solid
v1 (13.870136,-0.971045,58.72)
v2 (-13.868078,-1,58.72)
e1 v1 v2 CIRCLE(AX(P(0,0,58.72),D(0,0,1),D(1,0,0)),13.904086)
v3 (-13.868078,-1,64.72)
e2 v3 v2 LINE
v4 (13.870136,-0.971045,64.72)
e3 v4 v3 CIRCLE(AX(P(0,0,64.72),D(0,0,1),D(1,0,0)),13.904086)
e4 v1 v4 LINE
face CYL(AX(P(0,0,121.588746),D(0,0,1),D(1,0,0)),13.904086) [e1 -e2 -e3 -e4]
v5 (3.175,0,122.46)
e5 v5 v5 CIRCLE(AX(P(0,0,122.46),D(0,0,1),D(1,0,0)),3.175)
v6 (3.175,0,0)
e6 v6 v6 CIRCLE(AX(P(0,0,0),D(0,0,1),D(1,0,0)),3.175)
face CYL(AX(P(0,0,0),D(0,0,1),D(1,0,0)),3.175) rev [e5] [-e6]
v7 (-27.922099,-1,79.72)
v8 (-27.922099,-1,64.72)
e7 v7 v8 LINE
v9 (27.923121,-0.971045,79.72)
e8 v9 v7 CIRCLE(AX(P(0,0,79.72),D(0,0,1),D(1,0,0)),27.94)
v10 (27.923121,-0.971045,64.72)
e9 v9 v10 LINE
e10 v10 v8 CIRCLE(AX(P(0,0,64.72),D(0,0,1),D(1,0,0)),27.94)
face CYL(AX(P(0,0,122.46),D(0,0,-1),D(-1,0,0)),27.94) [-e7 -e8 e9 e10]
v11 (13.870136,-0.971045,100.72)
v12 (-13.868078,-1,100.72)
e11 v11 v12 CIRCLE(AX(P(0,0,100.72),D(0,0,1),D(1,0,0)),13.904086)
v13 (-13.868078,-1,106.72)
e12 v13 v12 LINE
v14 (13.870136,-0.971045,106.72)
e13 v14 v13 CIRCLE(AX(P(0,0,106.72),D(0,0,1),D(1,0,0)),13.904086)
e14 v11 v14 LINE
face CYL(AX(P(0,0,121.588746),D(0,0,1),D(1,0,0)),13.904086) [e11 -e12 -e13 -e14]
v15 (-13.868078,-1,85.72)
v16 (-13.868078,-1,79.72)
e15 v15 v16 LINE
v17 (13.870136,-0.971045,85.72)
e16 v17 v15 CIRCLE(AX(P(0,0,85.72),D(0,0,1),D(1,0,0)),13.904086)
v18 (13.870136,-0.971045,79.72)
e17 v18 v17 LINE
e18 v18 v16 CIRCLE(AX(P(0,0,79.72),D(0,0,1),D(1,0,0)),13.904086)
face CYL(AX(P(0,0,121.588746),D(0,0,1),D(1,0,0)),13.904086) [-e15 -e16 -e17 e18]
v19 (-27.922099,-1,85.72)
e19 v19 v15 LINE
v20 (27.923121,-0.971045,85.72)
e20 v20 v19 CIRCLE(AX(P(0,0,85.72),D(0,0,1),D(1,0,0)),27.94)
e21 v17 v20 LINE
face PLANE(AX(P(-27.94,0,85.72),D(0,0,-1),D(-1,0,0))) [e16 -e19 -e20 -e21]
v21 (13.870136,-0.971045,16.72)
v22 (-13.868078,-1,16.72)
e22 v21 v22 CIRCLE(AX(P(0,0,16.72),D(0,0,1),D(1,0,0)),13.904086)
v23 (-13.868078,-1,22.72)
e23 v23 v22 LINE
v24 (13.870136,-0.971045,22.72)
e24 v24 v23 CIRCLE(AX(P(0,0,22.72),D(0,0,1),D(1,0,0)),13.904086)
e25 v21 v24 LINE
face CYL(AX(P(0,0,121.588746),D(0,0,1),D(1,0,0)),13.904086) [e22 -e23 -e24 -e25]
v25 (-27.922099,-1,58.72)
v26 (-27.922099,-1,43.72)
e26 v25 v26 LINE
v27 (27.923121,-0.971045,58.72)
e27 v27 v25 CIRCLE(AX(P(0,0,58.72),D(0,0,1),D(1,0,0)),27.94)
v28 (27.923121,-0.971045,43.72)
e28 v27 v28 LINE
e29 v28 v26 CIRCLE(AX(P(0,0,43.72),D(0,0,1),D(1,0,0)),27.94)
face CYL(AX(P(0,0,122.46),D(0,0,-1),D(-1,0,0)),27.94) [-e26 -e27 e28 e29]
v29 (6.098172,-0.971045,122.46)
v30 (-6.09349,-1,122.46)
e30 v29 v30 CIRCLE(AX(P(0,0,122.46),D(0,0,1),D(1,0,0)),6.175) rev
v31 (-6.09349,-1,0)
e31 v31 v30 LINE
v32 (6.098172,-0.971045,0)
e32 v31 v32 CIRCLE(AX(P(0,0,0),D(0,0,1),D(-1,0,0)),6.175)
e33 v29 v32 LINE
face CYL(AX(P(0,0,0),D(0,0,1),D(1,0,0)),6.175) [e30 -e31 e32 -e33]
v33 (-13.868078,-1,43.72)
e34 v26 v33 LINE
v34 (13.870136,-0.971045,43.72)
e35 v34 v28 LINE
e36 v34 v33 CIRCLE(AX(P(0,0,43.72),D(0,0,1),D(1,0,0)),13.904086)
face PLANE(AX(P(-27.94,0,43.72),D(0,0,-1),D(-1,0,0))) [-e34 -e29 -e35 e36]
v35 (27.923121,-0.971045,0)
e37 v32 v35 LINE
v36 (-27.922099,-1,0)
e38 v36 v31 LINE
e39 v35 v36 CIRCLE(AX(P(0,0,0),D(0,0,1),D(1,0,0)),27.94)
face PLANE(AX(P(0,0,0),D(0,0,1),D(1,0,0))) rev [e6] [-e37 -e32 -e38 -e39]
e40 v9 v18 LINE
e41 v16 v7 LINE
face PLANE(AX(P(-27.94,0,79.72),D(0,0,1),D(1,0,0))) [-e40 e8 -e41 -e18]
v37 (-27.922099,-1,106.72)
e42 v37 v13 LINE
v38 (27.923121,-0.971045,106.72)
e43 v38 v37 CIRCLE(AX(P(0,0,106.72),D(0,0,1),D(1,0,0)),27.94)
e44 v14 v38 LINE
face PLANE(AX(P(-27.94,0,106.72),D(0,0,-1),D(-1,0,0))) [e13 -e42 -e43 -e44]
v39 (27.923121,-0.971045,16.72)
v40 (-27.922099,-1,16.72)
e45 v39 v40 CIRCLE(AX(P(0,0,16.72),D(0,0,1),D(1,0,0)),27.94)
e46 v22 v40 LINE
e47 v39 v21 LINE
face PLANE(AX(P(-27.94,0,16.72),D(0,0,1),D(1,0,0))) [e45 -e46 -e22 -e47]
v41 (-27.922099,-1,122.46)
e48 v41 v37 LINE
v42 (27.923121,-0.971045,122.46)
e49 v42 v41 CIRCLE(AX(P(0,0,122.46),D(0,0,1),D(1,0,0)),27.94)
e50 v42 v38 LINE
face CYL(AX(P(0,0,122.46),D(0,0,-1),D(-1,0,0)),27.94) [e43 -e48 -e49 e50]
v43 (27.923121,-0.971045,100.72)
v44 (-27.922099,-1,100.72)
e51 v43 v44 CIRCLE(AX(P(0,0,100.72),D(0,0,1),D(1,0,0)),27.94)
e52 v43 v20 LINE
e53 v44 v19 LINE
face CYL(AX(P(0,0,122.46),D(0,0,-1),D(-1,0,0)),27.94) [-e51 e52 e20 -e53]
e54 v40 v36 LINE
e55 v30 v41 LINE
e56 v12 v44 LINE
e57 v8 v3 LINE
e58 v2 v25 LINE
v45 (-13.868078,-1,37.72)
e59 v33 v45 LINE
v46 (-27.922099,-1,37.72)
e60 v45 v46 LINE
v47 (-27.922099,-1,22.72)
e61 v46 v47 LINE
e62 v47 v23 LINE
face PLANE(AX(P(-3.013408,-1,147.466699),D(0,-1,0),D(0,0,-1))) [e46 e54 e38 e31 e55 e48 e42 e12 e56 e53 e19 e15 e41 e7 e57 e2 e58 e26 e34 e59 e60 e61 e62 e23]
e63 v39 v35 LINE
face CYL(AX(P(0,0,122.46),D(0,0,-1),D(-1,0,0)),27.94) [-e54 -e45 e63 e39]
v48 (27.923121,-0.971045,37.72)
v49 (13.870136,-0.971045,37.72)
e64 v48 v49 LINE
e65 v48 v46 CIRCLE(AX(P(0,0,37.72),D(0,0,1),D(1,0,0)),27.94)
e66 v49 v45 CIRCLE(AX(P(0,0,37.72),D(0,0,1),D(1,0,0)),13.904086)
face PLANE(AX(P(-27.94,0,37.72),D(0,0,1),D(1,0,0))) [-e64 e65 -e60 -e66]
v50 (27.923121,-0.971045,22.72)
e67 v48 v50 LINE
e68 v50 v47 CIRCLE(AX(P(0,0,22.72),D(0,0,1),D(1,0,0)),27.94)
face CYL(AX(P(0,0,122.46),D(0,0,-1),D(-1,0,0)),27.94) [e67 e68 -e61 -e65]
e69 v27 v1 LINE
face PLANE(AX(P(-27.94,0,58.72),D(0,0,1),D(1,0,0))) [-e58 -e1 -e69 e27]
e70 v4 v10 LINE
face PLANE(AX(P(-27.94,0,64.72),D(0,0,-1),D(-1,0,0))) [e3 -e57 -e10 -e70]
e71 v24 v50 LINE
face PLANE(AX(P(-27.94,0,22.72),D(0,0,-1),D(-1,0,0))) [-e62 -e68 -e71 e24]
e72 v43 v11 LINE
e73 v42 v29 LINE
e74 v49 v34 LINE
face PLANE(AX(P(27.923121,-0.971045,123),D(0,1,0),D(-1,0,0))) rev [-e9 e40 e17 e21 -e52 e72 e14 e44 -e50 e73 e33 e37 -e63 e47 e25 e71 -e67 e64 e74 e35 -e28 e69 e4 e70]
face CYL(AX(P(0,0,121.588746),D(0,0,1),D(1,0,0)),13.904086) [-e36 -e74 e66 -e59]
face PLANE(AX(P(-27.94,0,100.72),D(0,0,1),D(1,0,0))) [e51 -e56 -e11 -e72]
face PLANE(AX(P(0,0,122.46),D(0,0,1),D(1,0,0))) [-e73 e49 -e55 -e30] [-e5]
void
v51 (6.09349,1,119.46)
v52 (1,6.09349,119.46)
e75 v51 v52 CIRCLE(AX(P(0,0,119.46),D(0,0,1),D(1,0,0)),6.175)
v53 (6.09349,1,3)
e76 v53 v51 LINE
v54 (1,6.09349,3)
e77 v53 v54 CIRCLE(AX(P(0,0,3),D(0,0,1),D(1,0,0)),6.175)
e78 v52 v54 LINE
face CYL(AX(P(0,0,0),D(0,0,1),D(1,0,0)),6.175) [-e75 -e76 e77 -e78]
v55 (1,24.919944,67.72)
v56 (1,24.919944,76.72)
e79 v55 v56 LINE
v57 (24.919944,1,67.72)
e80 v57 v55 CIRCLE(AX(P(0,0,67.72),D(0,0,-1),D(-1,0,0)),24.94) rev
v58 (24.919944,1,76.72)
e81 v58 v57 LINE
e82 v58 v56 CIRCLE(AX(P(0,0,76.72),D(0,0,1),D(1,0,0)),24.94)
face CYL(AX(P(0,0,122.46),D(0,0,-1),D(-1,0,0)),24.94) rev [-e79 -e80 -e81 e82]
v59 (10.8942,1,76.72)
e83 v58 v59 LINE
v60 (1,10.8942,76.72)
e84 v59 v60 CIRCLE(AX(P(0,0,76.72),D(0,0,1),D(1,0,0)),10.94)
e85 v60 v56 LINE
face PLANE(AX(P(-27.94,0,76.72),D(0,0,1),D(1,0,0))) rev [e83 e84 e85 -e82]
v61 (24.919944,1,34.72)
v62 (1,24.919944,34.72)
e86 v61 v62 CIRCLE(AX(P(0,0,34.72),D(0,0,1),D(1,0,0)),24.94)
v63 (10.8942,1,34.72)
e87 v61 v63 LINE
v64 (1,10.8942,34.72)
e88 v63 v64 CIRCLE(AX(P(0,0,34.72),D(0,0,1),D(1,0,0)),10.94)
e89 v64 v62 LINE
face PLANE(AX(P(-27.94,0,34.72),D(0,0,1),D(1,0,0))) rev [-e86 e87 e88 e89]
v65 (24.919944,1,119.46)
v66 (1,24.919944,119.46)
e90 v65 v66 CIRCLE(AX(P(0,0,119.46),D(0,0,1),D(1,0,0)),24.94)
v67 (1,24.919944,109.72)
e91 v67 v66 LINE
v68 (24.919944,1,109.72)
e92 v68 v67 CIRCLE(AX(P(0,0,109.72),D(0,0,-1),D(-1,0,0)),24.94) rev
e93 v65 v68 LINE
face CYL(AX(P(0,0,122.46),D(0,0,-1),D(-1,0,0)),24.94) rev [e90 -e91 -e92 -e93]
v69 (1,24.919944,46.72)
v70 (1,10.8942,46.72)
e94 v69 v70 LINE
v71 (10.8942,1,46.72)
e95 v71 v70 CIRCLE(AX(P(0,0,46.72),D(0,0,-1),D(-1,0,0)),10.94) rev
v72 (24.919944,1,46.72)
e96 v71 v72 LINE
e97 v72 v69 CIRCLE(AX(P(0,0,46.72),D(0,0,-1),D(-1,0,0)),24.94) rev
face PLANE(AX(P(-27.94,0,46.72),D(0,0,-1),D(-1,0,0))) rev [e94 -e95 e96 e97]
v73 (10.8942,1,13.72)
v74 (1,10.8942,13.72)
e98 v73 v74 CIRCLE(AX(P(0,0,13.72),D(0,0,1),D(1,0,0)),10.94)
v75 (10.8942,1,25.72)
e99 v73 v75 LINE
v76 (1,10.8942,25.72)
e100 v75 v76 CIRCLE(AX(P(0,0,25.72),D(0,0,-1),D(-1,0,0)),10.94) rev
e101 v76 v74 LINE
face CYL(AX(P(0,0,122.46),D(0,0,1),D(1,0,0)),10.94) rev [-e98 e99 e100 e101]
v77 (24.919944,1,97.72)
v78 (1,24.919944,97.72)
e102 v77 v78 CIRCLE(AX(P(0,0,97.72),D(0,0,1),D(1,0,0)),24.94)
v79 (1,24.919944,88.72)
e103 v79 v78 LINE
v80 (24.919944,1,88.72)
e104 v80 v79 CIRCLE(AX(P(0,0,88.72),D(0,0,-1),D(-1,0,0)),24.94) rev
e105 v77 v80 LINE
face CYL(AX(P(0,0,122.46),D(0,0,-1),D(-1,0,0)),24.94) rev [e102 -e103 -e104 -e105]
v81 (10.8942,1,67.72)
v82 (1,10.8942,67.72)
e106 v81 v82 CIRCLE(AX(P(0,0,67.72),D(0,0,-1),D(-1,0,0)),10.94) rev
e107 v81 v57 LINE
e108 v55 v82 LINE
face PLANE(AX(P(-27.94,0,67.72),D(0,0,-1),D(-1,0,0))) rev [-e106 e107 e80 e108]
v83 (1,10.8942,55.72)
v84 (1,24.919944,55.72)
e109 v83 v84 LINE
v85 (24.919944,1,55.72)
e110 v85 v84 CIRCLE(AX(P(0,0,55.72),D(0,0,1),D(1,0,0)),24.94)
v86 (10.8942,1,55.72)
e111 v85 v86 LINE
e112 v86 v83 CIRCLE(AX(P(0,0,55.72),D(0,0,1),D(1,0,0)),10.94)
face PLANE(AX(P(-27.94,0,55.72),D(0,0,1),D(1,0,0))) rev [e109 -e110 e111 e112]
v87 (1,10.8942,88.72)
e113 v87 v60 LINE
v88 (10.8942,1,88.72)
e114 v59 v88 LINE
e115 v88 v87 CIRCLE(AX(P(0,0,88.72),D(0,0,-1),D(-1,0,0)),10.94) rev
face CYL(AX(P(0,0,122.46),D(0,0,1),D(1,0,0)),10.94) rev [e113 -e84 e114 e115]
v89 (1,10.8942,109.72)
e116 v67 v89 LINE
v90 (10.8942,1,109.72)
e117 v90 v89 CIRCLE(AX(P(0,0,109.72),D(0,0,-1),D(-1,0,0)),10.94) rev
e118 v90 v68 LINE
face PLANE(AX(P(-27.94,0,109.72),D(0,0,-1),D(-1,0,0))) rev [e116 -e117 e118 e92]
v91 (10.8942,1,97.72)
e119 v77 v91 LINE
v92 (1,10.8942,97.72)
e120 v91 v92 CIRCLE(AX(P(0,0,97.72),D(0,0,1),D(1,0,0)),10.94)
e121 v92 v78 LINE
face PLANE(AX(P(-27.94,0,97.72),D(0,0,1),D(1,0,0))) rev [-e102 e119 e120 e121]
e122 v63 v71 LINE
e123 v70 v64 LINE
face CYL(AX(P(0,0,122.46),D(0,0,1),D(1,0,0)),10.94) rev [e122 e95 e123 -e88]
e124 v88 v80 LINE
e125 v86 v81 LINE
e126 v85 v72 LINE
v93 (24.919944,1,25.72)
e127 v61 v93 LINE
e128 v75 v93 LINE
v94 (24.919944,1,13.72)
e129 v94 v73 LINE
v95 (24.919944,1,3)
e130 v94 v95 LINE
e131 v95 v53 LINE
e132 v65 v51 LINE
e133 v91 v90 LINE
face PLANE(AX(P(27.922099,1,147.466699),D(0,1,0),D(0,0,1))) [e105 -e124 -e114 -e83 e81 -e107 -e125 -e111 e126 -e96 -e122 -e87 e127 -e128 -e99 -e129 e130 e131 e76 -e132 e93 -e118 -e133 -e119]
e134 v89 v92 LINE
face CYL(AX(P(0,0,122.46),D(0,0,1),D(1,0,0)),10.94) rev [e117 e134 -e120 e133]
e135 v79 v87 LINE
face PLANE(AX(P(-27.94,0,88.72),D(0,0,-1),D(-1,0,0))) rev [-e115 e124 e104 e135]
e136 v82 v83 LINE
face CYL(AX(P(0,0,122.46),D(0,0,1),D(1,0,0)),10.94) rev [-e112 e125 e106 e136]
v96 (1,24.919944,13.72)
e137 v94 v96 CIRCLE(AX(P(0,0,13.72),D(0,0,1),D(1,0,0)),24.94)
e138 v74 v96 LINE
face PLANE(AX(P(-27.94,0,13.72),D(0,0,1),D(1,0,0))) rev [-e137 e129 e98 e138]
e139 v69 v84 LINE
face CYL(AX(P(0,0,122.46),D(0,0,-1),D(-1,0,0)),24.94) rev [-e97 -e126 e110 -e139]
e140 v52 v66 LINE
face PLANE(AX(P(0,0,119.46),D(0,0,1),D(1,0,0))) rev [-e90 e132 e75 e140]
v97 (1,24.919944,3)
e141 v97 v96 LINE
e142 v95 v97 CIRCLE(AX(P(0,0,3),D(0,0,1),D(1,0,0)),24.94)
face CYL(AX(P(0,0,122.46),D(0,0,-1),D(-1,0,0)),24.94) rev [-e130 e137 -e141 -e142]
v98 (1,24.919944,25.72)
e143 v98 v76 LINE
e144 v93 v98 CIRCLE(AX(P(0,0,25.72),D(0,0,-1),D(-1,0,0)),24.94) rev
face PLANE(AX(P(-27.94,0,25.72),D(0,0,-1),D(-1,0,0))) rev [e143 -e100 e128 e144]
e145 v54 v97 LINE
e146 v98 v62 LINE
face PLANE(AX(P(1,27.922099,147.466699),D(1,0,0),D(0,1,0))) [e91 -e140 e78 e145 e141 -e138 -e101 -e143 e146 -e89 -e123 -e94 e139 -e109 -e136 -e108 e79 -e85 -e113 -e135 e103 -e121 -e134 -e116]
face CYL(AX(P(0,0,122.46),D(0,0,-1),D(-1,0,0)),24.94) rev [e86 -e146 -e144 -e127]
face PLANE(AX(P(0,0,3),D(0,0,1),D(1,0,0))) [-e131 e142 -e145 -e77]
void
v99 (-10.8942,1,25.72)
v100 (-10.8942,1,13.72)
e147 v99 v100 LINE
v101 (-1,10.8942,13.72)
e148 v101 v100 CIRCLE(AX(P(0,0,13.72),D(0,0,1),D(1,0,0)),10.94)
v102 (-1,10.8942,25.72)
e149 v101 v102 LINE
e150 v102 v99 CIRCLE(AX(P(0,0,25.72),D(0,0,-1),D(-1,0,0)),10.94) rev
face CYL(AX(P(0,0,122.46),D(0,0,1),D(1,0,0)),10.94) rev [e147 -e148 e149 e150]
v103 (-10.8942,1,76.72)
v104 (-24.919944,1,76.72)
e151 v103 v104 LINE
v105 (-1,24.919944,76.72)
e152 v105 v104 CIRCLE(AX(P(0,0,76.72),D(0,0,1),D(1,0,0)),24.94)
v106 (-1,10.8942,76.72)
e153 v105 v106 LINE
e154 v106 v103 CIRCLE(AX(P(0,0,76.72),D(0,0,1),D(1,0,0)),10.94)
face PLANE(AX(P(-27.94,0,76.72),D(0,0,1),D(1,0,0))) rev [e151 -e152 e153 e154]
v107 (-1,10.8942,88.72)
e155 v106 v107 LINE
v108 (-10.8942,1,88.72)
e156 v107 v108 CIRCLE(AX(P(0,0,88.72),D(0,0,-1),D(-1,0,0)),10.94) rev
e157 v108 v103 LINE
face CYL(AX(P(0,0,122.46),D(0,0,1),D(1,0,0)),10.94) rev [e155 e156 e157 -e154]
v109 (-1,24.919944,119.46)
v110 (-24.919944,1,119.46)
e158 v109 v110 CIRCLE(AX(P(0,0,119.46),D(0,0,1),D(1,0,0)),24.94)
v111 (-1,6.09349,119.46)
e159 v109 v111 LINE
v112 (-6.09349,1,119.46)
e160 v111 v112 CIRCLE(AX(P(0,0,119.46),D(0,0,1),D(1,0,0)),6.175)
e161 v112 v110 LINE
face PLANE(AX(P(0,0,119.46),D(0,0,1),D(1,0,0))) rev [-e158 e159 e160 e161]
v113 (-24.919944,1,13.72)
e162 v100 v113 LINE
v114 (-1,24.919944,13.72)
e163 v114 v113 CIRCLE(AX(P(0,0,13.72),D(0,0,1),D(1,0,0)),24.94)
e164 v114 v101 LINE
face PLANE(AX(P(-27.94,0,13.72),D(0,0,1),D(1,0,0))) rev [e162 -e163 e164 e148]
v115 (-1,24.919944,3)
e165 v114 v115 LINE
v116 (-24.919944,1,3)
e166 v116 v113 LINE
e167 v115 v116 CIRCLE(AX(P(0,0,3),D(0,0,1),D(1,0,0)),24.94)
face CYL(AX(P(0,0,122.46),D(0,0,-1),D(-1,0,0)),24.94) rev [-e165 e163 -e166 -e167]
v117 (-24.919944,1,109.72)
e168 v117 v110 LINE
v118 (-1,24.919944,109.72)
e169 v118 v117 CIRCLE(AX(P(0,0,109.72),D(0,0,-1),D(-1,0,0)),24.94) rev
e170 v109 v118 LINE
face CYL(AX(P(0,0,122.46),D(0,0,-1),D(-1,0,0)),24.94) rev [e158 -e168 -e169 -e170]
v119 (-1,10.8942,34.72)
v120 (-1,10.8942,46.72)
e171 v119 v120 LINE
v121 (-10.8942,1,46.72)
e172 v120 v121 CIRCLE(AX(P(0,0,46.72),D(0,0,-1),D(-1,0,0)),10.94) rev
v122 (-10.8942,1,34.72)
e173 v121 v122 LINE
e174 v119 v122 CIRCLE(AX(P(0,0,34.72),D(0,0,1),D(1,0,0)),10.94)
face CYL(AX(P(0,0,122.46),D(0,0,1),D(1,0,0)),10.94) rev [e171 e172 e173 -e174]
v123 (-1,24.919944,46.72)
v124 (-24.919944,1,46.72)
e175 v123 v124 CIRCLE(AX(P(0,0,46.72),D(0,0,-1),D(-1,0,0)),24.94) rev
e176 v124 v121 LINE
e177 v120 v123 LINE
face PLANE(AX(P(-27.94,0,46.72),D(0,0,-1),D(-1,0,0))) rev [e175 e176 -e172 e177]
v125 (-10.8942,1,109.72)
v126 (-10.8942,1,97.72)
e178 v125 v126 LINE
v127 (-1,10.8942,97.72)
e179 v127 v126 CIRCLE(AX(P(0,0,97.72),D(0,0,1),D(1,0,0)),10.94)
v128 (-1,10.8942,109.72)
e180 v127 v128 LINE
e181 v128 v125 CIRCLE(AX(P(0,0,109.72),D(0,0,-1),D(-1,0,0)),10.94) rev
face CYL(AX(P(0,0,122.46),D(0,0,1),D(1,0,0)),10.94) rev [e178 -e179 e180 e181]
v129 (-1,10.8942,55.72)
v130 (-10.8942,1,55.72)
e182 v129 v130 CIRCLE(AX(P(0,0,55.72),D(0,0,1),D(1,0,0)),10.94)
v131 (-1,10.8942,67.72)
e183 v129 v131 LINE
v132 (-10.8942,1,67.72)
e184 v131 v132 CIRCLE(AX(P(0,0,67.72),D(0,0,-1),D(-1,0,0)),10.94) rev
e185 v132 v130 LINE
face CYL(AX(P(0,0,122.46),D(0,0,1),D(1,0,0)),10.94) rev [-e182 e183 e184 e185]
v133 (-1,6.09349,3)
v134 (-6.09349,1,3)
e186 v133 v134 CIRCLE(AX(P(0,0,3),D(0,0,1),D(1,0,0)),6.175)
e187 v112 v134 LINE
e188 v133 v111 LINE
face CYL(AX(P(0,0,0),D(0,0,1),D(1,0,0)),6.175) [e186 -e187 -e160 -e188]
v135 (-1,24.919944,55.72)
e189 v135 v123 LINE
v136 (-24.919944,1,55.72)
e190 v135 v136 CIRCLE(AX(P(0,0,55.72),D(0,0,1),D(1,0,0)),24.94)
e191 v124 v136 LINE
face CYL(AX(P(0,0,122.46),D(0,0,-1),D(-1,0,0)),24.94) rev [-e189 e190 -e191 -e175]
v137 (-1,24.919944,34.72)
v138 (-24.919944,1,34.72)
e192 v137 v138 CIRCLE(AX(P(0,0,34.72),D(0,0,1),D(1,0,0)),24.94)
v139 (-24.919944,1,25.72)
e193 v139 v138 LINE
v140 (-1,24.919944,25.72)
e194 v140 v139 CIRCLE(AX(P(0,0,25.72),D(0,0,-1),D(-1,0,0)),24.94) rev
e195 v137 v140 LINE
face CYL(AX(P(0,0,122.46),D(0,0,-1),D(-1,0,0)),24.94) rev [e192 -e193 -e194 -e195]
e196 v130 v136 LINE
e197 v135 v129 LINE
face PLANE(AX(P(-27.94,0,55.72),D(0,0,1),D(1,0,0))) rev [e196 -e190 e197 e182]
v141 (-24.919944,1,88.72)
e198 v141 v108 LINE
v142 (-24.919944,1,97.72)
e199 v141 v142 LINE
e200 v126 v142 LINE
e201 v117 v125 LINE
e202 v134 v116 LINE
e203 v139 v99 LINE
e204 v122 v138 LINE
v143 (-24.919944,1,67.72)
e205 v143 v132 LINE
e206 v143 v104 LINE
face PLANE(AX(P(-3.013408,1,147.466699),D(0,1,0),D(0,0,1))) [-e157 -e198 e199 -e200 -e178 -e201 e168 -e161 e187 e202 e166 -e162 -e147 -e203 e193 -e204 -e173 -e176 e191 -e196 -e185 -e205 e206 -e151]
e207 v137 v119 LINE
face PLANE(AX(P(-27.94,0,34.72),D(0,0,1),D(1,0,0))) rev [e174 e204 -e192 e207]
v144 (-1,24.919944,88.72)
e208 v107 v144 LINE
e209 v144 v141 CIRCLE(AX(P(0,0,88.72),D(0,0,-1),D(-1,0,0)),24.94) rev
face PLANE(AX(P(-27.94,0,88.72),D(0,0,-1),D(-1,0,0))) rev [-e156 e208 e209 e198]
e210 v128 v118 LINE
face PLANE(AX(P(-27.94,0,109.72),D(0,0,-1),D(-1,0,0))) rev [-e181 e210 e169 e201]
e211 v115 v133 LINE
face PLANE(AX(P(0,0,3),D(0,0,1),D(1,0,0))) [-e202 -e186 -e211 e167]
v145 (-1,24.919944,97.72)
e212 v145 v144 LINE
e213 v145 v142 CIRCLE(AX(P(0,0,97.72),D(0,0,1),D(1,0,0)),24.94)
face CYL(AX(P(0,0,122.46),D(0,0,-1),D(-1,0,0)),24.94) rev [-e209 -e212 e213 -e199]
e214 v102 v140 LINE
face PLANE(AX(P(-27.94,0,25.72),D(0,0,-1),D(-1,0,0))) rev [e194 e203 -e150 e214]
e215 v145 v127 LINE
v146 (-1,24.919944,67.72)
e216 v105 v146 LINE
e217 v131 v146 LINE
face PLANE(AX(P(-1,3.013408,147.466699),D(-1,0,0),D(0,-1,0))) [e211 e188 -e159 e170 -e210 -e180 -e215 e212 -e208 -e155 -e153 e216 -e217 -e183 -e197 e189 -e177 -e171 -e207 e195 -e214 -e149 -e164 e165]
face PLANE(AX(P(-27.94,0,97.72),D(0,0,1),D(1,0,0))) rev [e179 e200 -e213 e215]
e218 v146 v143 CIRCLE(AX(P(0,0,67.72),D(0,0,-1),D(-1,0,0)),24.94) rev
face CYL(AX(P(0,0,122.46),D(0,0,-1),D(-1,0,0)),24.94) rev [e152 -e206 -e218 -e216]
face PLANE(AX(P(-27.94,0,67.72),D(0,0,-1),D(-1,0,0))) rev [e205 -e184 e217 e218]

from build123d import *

# Parameters (mm, degrees)
SKETCH3_R            = 27.94
BOSS_EXTRUDE2_DEPTH  = 122.46
SKETCH5_R            = 3.175
CUT_EXTRUDE1_DEPTH   = 129.676877488
SKETCH4_W            = 14
SKETCH4_H            = 6
SHELL1_START         = 3
SHELL1_OUTLINE_R     = 10.94
SHELL1_OUTLINE_R_2   = 6.175
SHELL1_DEPTH         = 116.46
SHELL1_2_OUTLINE_R   = 24.94
SHELL1_2_OUTLINE_R_2 = 10.94
SHELL1_2_DEPTH       = 10.72
SHELL1_START_2       = 109.72
SHELL1_3_OUTLINE_R   = 24.94
SHELL1_3_OUTLINE_R_2 = 10.94
SHELL1_3_DEPTH       = 9.74
SHELL1_START_3       = 25.72
SHELL1_4_OUTLINE_R   = 24.94
SHELL1_4_OUTLINE_R_2 = 10.94
SHELL1_4_DEPTH       = 9
SHELL1_START_4       = 46.72
SHELL1_5_OUTLINE_R   = 24.94
SHELL1_5_OUTLINE_R_2 = 10.94
SHELL1_5_DEPTH       = 9
SHELL1_START_5       = 67.72
SHELL1_6_OUTLINE_R   = 24.94
SHELL1_6_OUTLINE_R_2 = 10.94
SHELL1_6_DEPTH       = 9
SHELL1_START_6       = 88.72
SHELL1_7_OUTLINE_R   = 24.94
SHELL1_7_OUTLINE_R_2 = 10.94
SHELL1_7_DEPTH       = 9
BOSS_EXTRUDE3_REACH  = 130.677
SKETCH13_W           = 16.483162312
SKETCH13_H           = 6
CUT_EXTRUDE3_DEPTH   = 123


# Read off the part's stored shape, not the designer's step: Shell1
with BuildPart() as part:
    # Sketch3 → Boss-Extrude2 (new body)
    with BuildSketch(Plane.XY):
        Circle(SKETCH3_R)
    extrude(amount=BOSS_EXTRUDE2_DEPTH)

    # Sketch5 → Cut-Extrude1 (cut, through all)
    with BuildSketch(Plane.XY.offset(122.46)):
        Circle(SKETCH5_R)
    extrude(amount=-CUT_EXTRUDE1_DEPTH, mode=Mode.SUBTRACT)

    # Sketch4 → Cut-Revolve1 (revolve, cut)
    with BuildSketch(Plane(origin=(0, 0, 0), x_dir=(1, 0, 0), z_dir=(0, 1, 0)), mode=Mode.PRIVATE) as cut_revolve1_sk:
        with Locations((-20.94, -103.72)):
            Rectangle(SKETCH4_W, SKETCH4_H)
        with Locations((-20.94, -82.72)):
            Rectangle(SKETCH4_W, SKETCH4_H)
        with Locations((-20.94, -61.72)):
            Rectangle(SKETCH4_W, SKETCH4_H)
        with Locations((-20.94, -40.72)):
            Rectangle(SKETCH4_W, SKETCH4_H)
        with Locations((-20.94, -19.72)):
            Rectangle(SKETCH4_W, SKETCH4_H)
    revolve(cut_revolve1_sk.sketch.rotate(Axis((0, 0, 122.46), (0, 0, -1)), 180), axis=Axis((0, 0, 122.46), (0, 0, -1)), mode=Mode.SUBTRACT)

    # Shell1 outline → Shell1 (cut)
    with BuildSketch(Plane.XY.offset(SHELL1_START)):
        Circle(SHELL1_OUTLINE_R)
        Circle(SHELL1_OUTLINE_R_2, mode=Mode.SUBTRACT)
    extrude(amount=SHELL1_DEPTH, mode=Mode.SUBTRACT)

    # Shell1 2 outline → Shell1 2 (cut)
    with BuildSketch(Plane.XY.offset(SHELL1_START)):
        Circle(SHELL1_2_OUTLINE_R)
        Circle(SHELL1_2_OUTLINE_R_2, mode=Mode.SUBTRACT)
    extrude(amount=SHELL1_2_DEPTH, mode=Mode.SUBTRACT)

    # Shell1 3 outline → Shell1 3 (cut)
    with BuildSketch(Plane.XY.offset(SHELL1_START_2)):
        Circle(SHELL1_3_OUTLINE_R)
        Circle(SHELL1_3_OUTLINE_R_2, mode=Mode.SUBTRACT)
    extrude(amount=SHELL1_3_DEPTH, mode=Mode.SUBTRACT)

    # Shell1 4 outline → Shell1 4 (cut)
    with BuildSketch(Plane.XY.offset(SHELL1_START_3)):
        Circle(SHELL1_4_OUTLINE_R)
        Circle(SHELL1_4_OUTLINE_R_2, mode=Mode.SUBTRACT)
    extrude(amount=SHELL1_4_DEPTH, mode=Mode.SUBTRACT)

    # Shell1 5 outline → Shell1 5 (cut)
    with BuildSketch(Plane.XY.offset(SHELL1_START_4)):
        Circle(SHELL1_5_OUTLINE_R)
        Circle(SHELL1_5_OUTLINE_R_2, mode=Mode.SUBTRACT)
    extrude(amount=SHELL1_5_DEPTH, mode=Mode.SUBTRACT)

    # Shell1 6 outline → Shell1 6 (cut)
    with BuildSketch(Plane.XY.offset(SHELL1_START_5)):
        Circle(SHELL1_6_OUTLINE_R)
        Circle(SHELL1_6_OUTLINE_R_2, mode=Mode.SUBTRACT)
    extrude(amount=SHELL1_6_DEPTH, mode=Mode.SUBTRACT)

    # Shell1 7 outline → Shell1 7 (cut)
    with BuildSketch(Plane.XY.offset(SHELL1_START_6)):
        Circle(SHELL1_7_OUTLINE_R)
        Circle(SHELL1_7_OUTLINE_R_2, mode=Mode.SUBTRACT)
    extrude(amount=SHELL1_7_DEPTH, mode=Mode.SUBTRACT)

    # Boss-Extrude3: up to this face of the body (flat: up to its plane)
    boss_extrude3_end = Plane(part.part.faces().sort_by_distance((-27.149737461, 0, 122.46))[0])
    # Sketch10 → Boss-Extrude3 (add, up to the picked face)
    with BuildSketch(Plane(origin=(0, 0, 0), x_dir=(-1, 0, 0), z_dir=(0, 0, -1)), mode=Mode.PRIVATE) as boss_extrude3_sk1:
        with BuildLine():
            Line((-1, 27.922098775), (-1, 3.01340754))
            ThreePointArc((-1, 3.01340754), (0, 3.175), (1, 3.01340754))
            Line((1, 3.01340754), (1, 27.922098775))
            ThreePointArc((1, 27.922098775), (0, 27.94), (-1, 27.922098775))
        make_face()
    boss_extrude3_tool1 = split(extrude(boss_extrude3_sk1.sketch, amount=-BOSS_EXTRUDE3_REACH, mode=Mode.PRIVATE), bisect_by=boss_extrude3_end, keep=Keep.BOTH, mode=Mode.PRIVATE)
    # Sketch10 → Boss-Extrude3 (add, up to the picked face)
    with BuildSketch(Plane(origin=(0, 0, 0), x_dir=(-1, 0, 0), z_dir=(0, 0, -1)), mode=Mode.PRIVATE) as boss_extrude3_sk2:
        with BuildLine():
            Line((3.01340754, 1), (27.922098775, 1))
            ThreePointArc((27.922098775, 1), (27.94, 0), (27.922098775, -1))
            Line((27.922098775, -1), (3.01340754, -1))
            ThreePointArc((3.01340754, -1), (3.175, 0), (3.01340754, 1))
        make_face()
    boss_extrude3_tool2 = split(extrude(boss_extrude3_sk2.sketch, amount=-BOSS_EXTRUDE3_REACH, mode=Mode.PRIVATE), bisect_by=boss_extrude3_end, keep=Keep.BOTH, mode=Mode.PRIVATE)
    # Sketch10 → Boss-Extrude3 (add, up to the picked face)
    with BuildSketch(Plane(origin=(0, 0, 0), x_dir=(-1, 0, 0), z_dir=(0, 0, -1)), mode=Mode.PRIVATE) as boss_extrude3_sk3:
        with BuildLine():
            Line((-1, -3.01340754), (-1, -27.922098775))
            ThreePointArc((-1, -27.922098775), (0, -27.94), (1, -27.922098775))
            Line((1, -27.922098775), (1, -3.01340754))
            ThreePointArc((1, -3.01340754), (0, -3.175), (-1, -3.01340754))
        make_face()
    boss_extrude3_tool3 = split(extrude(boss_extrude3_sk3.sketch, amount=-BOSS_EXTRUDE3_REACH, mode=Mode.PRIVATE), bisect_by=boss_extrude3_end, keep=Keep.BOTH, mode=Mode.PRIVATE)
    # Sketch10 → Boss-Extrude3 (add, up to the picked face)
    with BuildSketch(Plane(origin=(0, 0, 0), x_dir=(-1, 0, 0), z_dir=(0, 0, -1)), mode=Mode.PRIVATE) as boss_extrude3_sk4:
        with BuildLine():
            Line((-27.922098775, -1), (-3.01340754, -1))
            ThreePointArc((-3.01340754, -1), (-3.175, 0), (-3.01340754, 1))
            Line((-3.01340754, 1), (-27.922098775, 1))
            ThreePointArc((-27.922098775, 1), (-27.94, 0), (-27.922098775, -1))
        make_face()
    boss_extrude3_tool4 = split(extrude(boss_extrude3_sk4.sketch, amount=-BOSS_EXTRUDE3_REACH, mode=Mode.PRIVATE), bisect_by=boss_extrude3_end, keep=Keep.BOTH, mode=Mode.PRIVATE)
    add(boss_extrude3_tool1.solids().sort_by(Axis((0, 15.527819, 0), (0, 0, 1)))[0])
    add(boss_extrude3_tool2.solids().sort_by(Axis((-15.527819, 0, 0), (0, 0, 1)))[0])
    add(boss_extrude3_tool3.solids().sort_by(Axis((0, -15.527819, 0), (0, 0, 1)))[0])
    add(boss_extrude3_tool4.solids().sort_by(Axis((15.527819, 0, 0), (0, 0, 1)))[0])

    # Sketch13 → Cut-Revolve2 (revolve, cut)
    with BuildSketch(Plane(origin=(0, 0, 0), x_dir=(1, 0, 0), z_dir=(0, 1, 0)), mode=Mode.PRIVATE) as cut_revolve2_sk:
        with Locations((-22.145666886, -40.72)):
            Rectangle(SKETCH13_W, SKETCH13_H)
        with Locations((-22.145666886, -19.72)):
            Rectangle(SKETCH13_W, SKETCH13_H)
        with Locations((-22.145666886, -61.72)):
            Rectangle(SKETCH13_W, SKETCH13_H)
        with Locations((-22.145666886, -82.72)):
            Rectangle(SKETCH13_W, SKETCH13_H)
        with Locations((-22.145666886, -103.72)):
            Rectangle(SKETCH13_W, SKETCH13_H)
    revolve(cut_revolve2_sk.sketch.rotate(Axis((0, 0, 121.588746248), (0, 0, -1)), 180), axis=Axis((0, 0, 121.588746248), (0, 0, -1)), mode=Mode.SUBTRACT)

    # Sketch16 → Cut-Extrude3 (cut)
    with BuildSketch(Plane(origin=(0, 0, 0), x_dir=(-1, 0, 0), z_dir=(0, 0, -1))):
        with BuildLine():
            Line((-27.923120749, -0.971044624), (-6.098171639, -0.971044624))
            ThreePointArc((-6.098171639, -0.971044624), (-0.014665674, -6.174982584), (6.093490379, -1))
            Line((6.093490379, -1), (27.922098775, -1))
            ThreePointArc((27.922098775, -1), (-0.014486703, -27.939996244), (-27.923120749, -0.971044624))
        make_face()
    extrude(amount=-CUT_EXTRUDE3_DEPTH, mode=Mode.SUBTRACT)


solid = part.part
